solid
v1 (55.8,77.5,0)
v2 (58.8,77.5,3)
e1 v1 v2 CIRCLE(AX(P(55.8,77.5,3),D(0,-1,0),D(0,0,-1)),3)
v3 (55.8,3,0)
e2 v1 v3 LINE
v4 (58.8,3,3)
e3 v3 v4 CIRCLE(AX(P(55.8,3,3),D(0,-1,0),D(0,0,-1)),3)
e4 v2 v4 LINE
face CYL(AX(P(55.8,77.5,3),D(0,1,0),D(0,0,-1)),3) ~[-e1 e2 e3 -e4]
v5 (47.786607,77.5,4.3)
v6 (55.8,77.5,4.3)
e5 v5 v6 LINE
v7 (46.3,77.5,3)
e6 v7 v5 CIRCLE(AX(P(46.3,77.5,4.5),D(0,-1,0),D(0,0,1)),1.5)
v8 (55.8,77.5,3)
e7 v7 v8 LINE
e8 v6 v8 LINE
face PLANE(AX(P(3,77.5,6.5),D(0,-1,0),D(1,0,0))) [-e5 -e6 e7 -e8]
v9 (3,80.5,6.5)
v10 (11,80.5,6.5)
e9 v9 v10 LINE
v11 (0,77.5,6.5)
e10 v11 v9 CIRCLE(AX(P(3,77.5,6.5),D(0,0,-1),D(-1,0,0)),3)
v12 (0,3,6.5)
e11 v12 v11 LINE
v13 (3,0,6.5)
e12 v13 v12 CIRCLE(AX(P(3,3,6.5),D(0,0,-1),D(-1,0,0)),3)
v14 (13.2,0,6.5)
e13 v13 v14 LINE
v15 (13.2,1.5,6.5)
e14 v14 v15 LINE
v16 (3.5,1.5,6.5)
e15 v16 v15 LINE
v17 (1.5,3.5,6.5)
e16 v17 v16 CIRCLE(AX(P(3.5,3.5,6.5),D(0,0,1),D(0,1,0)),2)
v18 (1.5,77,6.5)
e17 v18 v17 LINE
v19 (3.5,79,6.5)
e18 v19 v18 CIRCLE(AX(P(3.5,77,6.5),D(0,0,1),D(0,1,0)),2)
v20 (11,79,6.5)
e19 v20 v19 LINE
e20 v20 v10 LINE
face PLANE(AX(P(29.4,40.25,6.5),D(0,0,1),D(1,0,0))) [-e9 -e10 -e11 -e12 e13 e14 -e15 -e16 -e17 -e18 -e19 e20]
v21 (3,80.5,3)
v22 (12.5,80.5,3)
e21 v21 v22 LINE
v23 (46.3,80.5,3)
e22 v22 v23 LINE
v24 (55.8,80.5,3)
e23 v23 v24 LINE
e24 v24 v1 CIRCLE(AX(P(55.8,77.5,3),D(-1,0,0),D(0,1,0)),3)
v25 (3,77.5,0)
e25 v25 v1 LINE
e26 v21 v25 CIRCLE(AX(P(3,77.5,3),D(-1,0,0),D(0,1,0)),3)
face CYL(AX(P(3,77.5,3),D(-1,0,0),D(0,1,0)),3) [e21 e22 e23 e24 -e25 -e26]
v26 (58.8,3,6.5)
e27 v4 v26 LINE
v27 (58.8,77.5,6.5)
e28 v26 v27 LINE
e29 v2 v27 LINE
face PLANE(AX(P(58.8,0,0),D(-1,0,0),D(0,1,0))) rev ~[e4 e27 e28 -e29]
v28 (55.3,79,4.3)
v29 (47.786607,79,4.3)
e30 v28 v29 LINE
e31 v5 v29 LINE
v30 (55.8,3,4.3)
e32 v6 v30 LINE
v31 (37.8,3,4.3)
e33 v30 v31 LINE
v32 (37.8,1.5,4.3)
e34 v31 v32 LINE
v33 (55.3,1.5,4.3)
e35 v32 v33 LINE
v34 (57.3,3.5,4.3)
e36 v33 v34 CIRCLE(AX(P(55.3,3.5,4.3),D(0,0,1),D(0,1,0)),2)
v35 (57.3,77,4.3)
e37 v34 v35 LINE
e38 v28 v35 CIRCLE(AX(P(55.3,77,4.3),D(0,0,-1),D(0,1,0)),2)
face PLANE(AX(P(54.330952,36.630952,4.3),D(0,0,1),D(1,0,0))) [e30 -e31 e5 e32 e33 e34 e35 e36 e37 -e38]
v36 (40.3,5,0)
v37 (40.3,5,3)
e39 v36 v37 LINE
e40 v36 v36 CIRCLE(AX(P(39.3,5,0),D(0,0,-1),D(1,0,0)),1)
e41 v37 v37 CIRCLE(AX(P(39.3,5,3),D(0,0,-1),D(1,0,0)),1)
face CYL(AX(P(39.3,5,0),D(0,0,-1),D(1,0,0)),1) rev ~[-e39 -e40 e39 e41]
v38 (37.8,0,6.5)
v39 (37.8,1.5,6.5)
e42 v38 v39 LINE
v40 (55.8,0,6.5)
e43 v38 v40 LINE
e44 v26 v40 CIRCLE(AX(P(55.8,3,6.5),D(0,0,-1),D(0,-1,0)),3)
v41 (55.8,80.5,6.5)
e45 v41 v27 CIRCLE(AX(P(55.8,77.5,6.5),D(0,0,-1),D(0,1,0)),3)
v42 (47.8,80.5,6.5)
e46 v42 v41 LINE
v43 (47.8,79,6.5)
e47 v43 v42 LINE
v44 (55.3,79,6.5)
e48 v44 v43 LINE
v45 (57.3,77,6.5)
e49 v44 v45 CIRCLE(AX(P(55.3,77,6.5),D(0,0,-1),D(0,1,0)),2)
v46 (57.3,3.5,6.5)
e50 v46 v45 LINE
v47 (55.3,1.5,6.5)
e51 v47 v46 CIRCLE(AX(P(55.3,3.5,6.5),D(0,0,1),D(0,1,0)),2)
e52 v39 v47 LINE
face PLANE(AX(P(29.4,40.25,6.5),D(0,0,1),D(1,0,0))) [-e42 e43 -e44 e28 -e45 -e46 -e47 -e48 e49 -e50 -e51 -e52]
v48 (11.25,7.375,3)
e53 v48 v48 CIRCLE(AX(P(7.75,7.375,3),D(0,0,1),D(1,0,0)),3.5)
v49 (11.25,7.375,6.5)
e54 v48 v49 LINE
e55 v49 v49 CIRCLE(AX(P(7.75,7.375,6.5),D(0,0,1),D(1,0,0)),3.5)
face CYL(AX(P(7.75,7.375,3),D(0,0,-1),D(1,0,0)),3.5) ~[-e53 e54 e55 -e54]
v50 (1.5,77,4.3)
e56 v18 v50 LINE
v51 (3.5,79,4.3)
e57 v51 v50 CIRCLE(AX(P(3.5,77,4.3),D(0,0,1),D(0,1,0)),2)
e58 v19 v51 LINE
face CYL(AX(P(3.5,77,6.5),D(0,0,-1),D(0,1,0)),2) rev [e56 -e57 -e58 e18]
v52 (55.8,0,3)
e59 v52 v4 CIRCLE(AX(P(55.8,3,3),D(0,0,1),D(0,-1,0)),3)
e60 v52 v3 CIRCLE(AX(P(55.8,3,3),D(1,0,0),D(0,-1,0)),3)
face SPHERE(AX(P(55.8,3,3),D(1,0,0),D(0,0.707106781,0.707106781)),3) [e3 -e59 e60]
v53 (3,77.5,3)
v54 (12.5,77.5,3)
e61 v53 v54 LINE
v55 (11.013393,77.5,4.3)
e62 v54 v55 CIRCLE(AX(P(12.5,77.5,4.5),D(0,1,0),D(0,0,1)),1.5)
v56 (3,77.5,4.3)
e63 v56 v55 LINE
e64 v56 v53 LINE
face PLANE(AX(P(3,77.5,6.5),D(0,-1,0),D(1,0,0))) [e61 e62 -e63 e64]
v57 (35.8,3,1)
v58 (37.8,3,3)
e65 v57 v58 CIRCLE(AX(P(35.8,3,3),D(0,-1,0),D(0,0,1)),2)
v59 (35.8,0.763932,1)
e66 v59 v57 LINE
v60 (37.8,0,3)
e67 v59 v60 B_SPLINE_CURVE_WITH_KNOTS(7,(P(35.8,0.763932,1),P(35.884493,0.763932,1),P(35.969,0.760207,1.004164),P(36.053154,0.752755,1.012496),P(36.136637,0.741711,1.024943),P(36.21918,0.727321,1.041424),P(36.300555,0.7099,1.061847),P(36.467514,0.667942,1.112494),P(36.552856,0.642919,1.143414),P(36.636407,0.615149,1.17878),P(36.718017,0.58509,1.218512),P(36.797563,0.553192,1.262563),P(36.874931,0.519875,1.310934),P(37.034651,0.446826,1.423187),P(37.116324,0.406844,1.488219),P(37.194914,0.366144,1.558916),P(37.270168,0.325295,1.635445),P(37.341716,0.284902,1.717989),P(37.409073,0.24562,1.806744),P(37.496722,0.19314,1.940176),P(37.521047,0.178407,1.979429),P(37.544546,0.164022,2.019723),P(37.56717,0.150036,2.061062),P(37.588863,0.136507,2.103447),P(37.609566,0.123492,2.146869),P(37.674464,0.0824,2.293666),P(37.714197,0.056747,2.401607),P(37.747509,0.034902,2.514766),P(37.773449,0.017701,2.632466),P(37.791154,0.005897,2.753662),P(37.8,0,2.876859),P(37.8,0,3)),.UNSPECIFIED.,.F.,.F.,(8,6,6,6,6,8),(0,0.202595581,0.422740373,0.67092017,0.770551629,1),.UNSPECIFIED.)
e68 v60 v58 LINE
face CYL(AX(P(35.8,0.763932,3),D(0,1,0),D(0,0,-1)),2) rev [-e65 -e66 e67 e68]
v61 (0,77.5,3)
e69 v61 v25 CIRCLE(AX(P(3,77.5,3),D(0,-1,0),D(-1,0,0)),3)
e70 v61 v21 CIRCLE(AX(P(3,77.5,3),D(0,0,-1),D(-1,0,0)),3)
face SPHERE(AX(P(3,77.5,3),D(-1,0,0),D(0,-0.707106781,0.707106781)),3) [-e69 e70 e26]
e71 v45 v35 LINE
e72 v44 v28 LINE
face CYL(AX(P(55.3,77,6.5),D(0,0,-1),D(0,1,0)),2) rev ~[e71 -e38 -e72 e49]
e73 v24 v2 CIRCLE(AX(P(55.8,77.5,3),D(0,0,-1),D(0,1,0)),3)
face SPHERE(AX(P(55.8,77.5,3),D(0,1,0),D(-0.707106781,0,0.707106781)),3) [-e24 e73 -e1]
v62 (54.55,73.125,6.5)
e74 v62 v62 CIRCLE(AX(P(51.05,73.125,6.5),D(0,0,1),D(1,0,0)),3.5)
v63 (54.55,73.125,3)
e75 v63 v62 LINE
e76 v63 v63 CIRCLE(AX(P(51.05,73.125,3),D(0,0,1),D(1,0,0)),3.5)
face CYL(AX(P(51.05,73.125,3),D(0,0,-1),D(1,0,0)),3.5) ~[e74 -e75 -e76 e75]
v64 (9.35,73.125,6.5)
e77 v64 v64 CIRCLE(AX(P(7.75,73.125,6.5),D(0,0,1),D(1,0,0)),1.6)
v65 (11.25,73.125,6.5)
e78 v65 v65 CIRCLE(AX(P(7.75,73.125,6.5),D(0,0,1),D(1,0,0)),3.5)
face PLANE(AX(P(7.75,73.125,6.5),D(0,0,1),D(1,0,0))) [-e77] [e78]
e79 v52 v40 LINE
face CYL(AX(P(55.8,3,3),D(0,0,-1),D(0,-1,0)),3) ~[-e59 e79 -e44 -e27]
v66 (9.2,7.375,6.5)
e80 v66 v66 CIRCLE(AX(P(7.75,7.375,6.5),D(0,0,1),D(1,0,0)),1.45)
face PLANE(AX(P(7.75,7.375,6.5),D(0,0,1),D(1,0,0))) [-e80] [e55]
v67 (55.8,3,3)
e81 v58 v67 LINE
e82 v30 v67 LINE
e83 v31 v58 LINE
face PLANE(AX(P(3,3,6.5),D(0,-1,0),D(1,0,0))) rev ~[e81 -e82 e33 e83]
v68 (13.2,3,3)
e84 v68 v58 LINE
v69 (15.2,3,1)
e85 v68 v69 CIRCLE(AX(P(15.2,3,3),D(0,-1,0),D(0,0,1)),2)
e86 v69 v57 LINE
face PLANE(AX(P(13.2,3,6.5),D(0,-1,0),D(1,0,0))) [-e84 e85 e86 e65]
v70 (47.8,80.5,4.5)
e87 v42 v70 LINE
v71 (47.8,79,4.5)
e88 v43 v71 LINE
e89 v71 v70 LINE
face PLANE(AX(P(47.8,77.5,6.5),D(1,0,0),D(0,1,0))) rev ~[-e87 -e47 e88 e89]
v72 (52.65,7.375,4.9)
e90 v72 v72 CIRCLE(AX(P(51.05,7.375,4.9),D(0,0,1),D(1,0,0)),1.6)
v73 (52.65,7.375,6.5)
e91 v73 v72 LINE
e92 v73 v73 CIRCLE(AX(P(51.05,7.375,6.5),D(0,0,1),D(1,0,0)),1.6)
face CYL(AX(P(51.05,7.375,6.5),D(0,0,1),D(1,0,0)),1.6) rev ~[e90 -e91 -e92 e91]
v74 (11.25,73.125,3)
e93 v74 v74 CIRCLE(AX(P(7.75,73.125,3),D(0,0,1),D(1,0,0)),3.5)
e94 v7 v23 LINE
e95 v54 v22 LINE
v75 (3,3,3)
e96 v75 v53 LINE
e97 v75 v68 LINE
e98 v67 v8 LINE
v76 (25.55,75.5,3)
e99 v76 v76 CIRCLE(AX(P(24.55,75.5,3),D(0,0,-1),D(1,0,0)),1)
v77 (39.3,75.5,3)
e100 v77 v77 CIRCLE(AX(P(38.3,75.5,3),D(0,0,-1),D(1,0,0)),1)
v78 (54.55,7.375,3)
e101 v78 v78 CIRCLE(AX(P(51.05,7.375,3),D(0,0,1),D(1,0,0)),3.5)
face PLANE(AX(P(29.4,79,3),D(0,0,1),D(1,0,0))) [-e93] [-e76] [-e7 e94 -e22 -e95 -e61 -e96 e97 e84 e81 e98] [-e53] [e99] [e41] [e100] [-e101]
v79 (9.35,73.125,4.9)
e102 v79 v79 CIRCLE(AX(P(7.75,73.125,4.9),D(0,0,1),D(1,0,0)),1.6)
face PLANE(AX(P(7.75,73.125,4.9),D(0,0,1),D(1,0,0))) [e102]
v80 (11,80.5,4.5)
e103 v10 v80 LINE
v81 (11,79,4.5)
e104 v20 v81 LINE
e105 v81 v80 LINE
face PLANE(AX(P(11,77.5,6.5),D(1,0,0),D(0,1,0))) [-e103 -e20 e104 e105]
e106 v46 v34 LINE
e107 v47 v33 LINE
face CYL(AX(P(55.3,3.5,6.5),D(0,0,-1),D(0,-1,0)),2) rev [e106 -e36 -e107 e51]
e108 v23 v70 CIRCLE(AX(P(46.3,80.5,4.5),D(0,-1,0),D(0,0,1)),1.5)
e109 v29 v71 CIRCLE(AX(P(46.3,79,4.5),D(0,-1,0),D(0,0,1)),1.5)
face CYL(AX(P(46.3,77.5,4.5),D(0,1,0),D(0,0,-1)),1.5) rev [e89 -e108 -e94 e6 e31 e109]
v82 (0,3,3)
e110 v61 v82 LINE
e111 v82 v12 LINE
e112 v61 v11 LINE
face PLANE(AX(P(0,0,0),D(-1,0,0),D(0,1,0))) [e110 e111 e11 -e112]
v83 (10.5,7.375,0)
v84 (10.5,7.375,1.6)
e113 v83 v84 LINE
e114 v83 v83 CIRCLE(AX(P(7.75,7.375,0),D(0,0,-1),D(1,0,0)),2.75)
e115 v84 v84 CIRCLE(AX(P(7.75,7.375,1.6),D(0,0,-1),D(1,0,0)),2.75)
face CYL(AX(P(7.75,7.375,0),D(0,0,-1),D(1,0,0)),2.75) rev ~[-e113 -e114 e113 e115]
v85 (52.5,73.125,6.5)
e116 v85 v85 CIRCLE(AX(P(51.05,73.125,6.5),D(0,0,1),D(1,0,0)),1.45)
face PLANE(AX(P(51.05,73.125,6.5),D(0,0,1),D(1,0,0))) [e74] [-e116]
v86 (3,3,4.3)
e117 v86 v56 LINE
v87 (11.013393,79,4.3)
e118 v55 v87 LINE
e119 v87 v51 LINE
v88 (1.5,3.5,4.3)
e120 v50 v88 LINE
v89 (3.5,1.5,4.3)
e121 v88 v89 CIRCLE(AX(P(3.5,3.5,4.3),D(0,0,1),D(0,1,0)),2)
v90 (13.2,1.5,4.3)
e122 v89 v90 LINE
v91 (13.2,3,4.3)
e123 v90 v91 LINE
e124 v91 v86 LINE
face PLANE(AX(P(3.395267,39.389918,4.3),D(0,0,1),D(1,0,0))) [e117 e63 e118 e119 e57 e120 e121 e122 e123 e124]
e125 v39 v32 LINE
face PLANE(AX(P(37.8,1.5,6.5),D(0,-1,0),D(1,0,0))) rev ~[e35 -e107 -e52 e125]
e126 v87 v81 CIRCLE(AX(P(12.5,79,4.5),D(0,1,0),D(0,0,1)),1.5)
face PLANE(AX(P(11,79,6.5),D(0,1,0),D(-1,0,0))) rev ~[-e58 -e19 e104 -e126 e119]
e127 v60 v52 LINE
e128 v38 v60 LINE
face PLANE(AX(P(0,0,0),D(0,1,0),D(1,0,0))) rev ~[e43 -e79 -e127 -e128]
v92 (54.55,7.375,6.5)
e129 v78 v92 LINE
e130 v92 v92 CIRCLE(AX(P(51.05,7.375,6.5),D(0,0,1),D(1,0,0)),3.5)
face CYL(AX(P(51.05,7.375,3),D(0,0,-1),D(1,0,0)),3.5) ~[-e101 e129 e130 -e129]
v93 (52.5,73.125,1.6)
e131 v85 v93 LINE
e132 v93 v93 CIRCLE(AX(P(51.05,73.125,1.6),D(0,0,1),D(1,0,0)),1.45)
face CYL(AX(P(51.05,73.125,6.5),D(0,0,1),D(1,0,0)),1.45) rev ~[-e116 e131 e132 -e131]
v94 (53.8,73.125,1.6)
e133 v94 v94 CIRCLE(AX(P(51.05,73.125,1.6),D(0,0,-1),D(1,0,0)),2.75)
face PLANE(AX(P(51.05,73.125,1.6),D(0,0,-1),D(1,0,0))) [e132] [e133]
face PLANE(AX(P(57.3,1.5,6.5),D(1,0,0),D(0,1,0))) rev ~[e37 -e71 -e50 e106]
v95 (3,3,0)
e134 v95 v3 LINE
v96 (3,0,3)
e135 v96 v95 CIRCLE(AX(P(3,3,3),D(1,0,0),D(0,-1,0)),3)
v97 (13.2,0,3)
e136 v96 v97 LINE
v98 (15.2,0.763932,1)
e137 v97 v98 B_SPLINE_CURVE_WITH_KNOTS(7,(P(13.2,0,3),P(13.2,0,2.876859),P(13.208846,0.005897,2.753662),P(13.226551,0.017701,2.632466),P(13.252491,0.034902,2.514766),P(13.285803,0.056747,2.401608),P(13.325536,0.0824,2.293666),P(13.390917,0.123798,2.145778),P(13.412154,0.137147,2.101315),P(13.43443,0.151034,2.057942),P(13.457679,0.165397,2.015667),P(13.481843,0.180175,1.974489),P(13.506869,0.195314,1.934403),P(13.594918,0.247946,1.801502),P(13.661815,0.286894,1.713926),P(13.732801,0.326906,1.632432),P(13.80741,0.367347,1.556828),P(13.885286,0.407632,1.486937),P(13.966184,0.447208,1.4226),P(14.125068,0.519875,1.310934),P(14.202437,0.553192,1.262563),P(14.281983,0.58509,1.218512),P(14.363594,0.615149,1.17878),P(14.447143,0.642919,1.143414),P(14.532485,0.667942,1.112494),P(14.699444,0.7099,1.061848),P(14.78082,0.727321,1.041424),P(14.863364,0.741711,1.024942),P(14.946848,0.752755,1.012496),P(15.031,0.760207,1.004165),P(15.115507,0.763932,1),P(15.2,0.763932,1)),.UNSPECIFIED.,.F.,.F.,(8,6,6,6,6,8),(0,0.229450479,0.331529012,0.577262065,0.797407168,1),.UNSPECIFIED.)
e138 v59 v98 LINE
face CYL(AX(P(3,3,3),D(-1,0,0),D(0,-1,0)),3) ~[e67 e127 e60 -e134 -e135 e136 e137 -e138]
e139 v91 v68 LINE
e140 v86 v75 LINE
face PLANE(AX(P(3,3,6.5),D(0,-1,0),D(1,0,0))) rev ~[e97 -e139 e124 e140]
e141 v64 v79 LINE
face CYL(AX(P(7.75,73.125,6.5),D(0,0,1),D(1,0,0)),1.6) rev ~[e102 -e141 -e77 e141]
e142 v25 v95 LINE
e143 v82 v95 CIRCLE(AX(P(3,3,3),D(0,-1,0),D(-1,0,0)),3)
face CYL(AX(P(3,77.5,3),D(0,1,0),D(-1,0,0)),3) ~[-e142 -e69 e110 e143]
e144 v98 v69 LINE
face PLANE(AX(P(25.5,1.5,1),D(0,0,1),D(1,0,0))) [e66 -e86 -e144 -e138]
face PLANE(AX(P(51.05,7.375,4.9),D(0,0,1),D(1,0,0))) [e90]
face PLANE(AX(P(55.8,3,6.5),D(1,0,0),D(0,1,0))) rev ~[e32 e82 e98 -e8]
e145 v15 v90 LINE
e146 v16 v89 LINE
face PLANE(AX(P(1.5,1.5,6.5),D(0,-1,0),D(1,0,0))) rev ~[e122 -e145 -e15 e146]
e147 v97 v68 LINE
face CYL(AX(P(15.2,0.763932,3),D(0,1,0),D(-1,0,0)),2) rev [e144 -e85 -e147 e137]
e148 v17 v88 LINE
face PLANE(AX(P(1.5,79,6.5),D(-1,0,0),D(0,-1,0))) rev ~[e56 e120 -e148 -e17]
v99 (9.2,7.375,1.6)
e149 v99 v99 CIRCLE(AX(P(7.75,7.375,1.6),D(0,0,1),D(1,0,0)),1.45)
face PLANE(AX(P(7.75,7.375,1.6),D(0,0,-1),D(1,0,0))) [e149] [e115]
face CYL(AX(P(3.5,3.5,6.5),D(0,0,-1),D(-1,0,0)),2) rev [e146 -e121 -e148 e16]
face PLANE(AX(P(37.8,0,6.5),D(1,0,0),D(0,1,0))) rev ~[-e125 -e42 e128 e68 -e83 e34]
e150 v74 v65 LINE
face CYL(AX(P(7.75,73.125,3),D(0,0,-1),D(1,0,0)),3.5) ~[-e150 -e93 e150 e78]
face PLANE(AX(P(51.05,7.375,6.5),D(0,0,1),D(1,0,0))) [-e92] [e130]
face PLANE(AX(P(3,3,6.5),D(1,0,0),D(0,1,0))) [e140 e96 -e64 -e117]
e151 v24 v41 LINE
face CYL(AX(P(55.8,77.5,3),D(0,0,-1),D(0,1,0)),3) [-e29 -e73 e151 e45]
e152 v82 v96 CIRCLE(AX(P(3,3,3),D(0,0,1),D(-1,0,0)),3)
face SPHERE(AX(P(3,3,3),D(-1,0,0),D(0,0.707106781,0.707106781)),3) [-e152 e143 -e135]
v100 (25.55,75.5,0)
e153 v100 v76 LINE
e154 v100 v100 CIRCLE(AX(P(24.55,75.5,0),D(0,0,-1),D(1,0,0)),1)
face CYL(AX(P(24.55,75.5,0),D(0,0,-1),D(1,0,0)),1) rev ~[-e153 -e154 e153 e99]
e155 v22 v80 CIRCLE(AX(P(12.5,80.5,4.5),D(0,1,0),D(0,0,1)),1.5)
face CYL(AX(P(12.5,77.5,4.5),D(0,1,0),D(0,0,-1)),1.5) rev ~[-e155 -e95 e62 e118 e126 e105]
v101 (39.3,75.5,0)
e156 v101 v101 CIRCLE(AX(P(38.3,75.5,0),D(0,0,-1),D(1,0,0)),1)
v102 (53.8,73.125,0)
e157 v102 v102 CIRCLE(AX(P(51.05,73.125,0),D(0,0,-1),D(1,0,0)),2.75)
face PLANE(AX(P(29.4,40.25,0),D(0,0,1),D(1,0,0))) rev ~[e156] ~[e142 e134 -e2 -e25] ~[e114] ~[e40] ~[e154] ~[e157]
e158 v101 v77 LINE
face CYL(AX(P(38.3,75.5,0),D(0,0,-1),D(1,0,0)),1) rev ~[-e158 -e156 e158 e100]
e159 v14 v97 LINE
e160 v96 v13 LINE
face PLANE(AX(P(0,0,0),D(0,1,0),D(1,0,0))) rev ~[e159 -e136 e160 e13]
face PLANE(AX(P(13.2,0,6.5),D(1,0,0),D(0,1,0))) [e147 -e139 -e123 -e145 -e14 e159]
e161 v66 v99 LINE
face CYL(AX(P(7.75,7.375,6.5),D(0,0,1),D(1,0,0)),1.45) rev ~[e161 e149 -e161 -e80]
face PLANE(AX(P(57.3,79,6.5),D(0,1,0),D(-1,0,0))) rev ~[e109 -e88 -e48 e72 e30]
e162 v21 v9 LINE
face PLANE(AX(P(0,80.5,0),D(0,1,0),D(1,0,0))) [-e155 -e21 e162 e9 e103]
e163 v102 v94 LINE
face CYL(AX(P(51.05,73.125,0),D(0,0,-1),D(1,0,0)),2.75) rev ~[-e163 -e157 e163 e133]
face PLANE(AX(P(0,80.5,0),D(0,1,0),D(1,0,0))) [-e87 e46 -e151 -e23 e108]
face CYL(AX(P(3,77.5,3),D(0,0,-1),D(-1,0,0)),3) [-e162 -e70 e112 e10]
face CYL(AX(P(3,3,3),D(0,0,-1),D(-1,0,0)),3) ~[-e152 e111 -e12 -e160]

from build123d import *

# Parameters (mm, degrees)
F0_W          = 58.8
F0_H          = 80.5
F1_DEPTH      = 6.5
F2_W          = 52.8
F2_H          = 74.5
F3_DEPTH      = 3.5
F5_R          = 3.5
F6_DEPTH      = 3.5
F8_R          = 1.45
F10_R         = 1.45
F11_DEPTH     = 6.501
F9_R          = 1.6
F7_R          = 1.6
F12_DEPTH     = 1.6
F13_W         = 36.8
F13_H         = 3
F14_DEPTH     = 3.5
F15_W         = 24.6
F15_H         = 3
F16_DEPTH     = 5.5
F19_DEPTH     = 2.2
F20_R         = 1
F21_DEPTH     = 6.501
F22_T1_DEPTH  = 11
F22_T3_DEPTH  = 52.8
F22_T5_DEPTH  = 74.5
F22_S9_W      = 3
F22_S9_H      = 3
F22_T10_DEPTH = 3
F22_S15_W     = 3
F22_S15_H     = 3
F22_T16_DEPTH = 3
F22_S21_W     = 3
F22_S21_H     = 3
F22_T22_DEPTH = 3
F22_S27_W     = 3
F22_S27_H     = 3
F22_T28_DEPTH = 3
F24_R         = 2
F25_R         = 1.5
F26_R         = 2
F27_R         = 2.75
F28_DEPTH     = 1.6


# Not quite as in the source:
# - a fillet or chamfer that OpenCascade refuses, or shapes differently, is made with other operations: its cross-section is extruded or revolved along the edge and cut away or added
# - a feature of the source that left no trace in its solid (it failed there, or was rolled back) is left out


with BuildPart() as f1:
    # F0 (on Top) → F1 (new body)
    with BuildSketch(Plane.XY):
        with Locations((29.4, 40.25)):
            Rectangle(F0_W, F0_H)
    extrude(amount=F1_DEPTH)

    # F2 (on face) → F3 (cut)
    with BuildSketch(Plane.XY.offset(6.5)):
        with Locations((29.4, 40.25)):
            Rectangle(F2_W, F2_H)
    extrude(amount=-F3_DEPTH, mode=Mode.SUBTRACT)

    # F5 (on face) → F6 (join)
    with BuildSketch(Plane.XY.offset(3)):
        with Locations((7.75, 7.375)):
            Circle(F5_R)
        with Locations((7.75, 73.125)):
            Circle(F5_R)
        with Locations((51.05, 73.125)):
            Circle(F5_R)
        with Locations((51.05, 7.375)):
            Circle(F5_R)
    extrude(amount=F6_DEPTH)

    # F8 (on face) + F10 (on face) → F11 (cut, through all)
    with BuildSketch(Plane.XY.offset(6.5)):
        with Locations((51.05, 73.125)):
            Circle(F8_R)
    with BuildSketch(Plane.XY.offset(6.5)):
        with Locations((7.75, 7.375)):
            Circle(F10_R)
    extrude(amount=-F11_DEPTH, mode=Mode.SUBTRACT)

    # F9 (on face) + F7 (on face) → F12 (cut)
    with BuildSketch(Plane.XY.offset(6.5)):
        with Locations((7.75, 73.125)):
            Circle(F9_R)
    with BuildSketch(Plane.XY.offset(6.5)):
        with Locations((51.05, 7.375)):
            Circle(F7_R)
    extrude(amount=-F12_DEPTH, mode=Mode.SUBTRACT)

    # F13 (on face) → F14 (cut)
    with BuildSketch(Plane.XY.offset(6.5)):
        with Locations((29.4, 79)):
            Rectangle(F13_W, F13_H)
    extrude(amount=-F14_DEPTH, mode=Mode.SUBTRACT)

    # F15 (on face) → F16 (cut)
    with BuildSketch(Plane.XY.offset(6.5)):
        with Locations((25.5, 1.5)):
            Rectangle(F15_W, F15_H)
    extrude(amount=-F16_DEPTH, mode=Mode.SUBTRACT)

    # F17 (on face) + F18 (on face) → F19 (cut)
    with BuildSketch(Plane.XY.offset(6.5)):
        Polygon((47.8, 79), (47.8, 77.5), (55.8, 77.5), (55.8, 3), (37.8, 3), (37.8, 1.5), (57.3, 1.5), (57.3, 79), align=None)
    with BuildSketch(Plane.XY.offset(6.5)):
        Polygon((1.5, 1.5), (13.2, 1.5), (13.2, 3), (3, 3), (3, 77.5), (11, 77.5), (11, 79), (1.5, 79), align=None)
    extrude(amount=-F19_DEPTH, mode=Mode.SUBTRACT)

    # F20 (on face) → F21 (cut, through all)
    with BuildSketch(Plane(origin=(0, 0, 0), x_dir=(1, 0, 0), z_dir=(0, 0, -1))):
        with Locations((39.3, -5)):
            Circle(F20_R)
        with Locations((38.3, -75.5)):
            Circle(F20_R)
        with Locations((24.55, -75.5)):
            Circle(F20_R)
    extrude(amount=-F21_DEPTH, mode=Mode.SUBTRACT)

    # F22: fillet of radius 3 on 8 edges, made by hand

    # F22_s2 → F22_t1 (cut)
    with BuildSketch(Plane.XY.offset(3)):
        with BuildLine():
            ThreePointArc((0, 3), (0.8786796564, 0.8786796564), (3, 0))
            Line((3, 0), (0, 0))
            Line((0, 0), (0, 3))
        make_face()
        with BuildLine():
            ThreePointArc((55.8, 0), (57.9213203436, 0.8786796564), (58.8, 3))
            Line((58.8, 3), (58.8, 0))
            Line((58.8, 0), (55.8, 0))
        make_face()
        with BuildLine():
            ThreePointArc((0, 77.5), (0.8786796564, 79.6213203436), (3, 80.5))
            Line((3, 80.5), (0, 80.5))
            Line((0, 80.5), (0, 77.5))
        make_face()
        with BuildLine():
            ThreePointArc((55.8, 80.5), (57.9213203436, 79.6213203436), (58.8, 77.5))
            Line((58.8, 77.5), (58.8, 80.5))
            Line((58.8, 80.5), (55.8, 80.5))
        make_face()
    extrude(amount=F22_T1_DEPTH, mode=Mode.SUBTRACT)

    # F22_s4 → F22_t3 (cut)
    with BuildSketch(Plane.YZ.offset(3)):
        with BuildLine():
            ThreePointArc((0, 3), (0.8786796564, 0.8786796564), (3, 0))
            Line((3, 0), (0, 0))
            Line((0, 0), (0, 3))
        make_face()
        with BuildLine():
            ThreePointArc((80.5, 3), (79.6213203436, 0.8786796564), (77.5, 0))
            Line((77.5, 0), (80.5, 0))
            Line((80.5, 0), (80.5, 3))
        make_face()
    extrude(amount=F22_T3_DEPTH, mode=Mode.SUBTRACT)

    # F22_s6 → F22_t5 (cut)
    with BuildSketch(Plane.XZ.offset(-77.5)):
        with BuildLine():
            ThreePointArc((0, 3), (0.8786796564, 0.8786796564), (3, 0))
            Line((3, 0), (0, 0))
            Line((0, 0), (0, 3))
        make_face()
        with BuildLine():
            ThreePointArc((55.8, 0), (57.9213203436, 0.8786796564), (58.8, 3))
            Line((58.8, 3), (58.8, 0))
            Line((58.8, 0), (55.8, 0))
        make_face()
    extrude(amount=F22_T5_DEPTH, mode=Mode.SUBTRACT)


with BuildPart() as f22_tool8:
    # F22_s9 → F22_t10 (new body)
    with BuildSketch(Plane.YZ.offset(3)):
        with Locations((1.5, 1.5)):
            Rectangle(F22_S9_W, F22_S9_H)
    extrude(amount=-F22_T10_DEPTH)

    # F22_s11 → F22_t12 (revolve, cut)
    with BuildSketch(Plane(origin=(3, 3, 3), x_dir=(0, 0.7071067812, 0.7071067812), z_dir=(0, -0.7071067812, 0.7071067812))):
        with BuildLine():
            ThreePointArc((0, -3), (3, 0), (0, 3))
            Line((0, 3), (0, -3))
        make_face()
    revolve(axis=Axis((3, 3, 3), (-1, 0, 0)), mode=Mode.SUBTRACT)


with BuildPart() as f1_1:
    add(f1.part)

    # F22_t7: cut F22_tool8
    add(f22_tool8.part, mode=Mode.SUBTRACT)


with BuildPart() as f22_tool14:
    # F22_s15 → F22_t16 (new body)
    with BuildSketch(Plane.YZ.offset(55.8)):
        with Locations((1.5, 1.5)):
            Rectangle(F22_S15_W, F22_S15_H)
    extrude(amount=F22_T16_DEPTH)

    # F22_s17 → F22_t18 (revolve, cut)
    with BuildSketch(Plane(origin=(55.8, 3, 3), x_dir=(0, 0.7071067812, 0.7071067812), z_dir=(0, 0.7071067812, -0.7071067812))):
        with BuildLine():
            ThreePointArc((0, -3), (3, 0), (0, 3))
            Line((0, 3), (0, -3))
        make_face()
    revolve(axis=Axis((55.8, 3, 3), (1, 0, 0)), mode=Mode.SUBTRACT)


with BuildPart() as f1_2:
    add(f1_1.part)

    # F22_t13: cut F22_tool14
    add(f22_tool14.part, mode=Mode.SUBTRACT)


with BuildPart() as f22_tool20:
    # F22_s21 → F22_t22 (new body)
    with BuildSketch(Plane.YZ.offset(3)):
        with Locations((79, 1.5)):
            Rectangle(F22_S21_W, F22_S21_H)
    extrude(amount=-F22_T22_DEPTH)

    # F22_s23 → F22_t24 (revolve, cut)
    with BuildSketch(Plane(origin=(3, 77.5, 3), x_dir=(0, -0.7071067812, 0.7071067812), z_dir=(0, -0.7071067812, -0.7071067812))):
        with BuildLine():
            ThreePointArc((0, -3), (3, 0), (0, 3))
            Line((0, 3), (0, -3))
        make_face()
    revolve(axis=Axis((3, 77.5, 3), (-1, 0, 0)), mode=Mode.SUBTRACT)


with BuildPart() as f1_3:
    add(f1_2.part)

    # F22_t19: cut F22_tool20
    add(f22_tool20.part, mode=Mode.SUBTRACT)


with BuildPart() as f22_tool26:
    # F22_s27 → F22_t28 (new body)
    with BuildSketch(Plane.XZ.offset(-77.5)):
        with Locations((57.3, 1.5)):
            Rectangle(F22_S27_W, F22_S27_H)
    extrude(amount=-F22_T28_DEPTH)

    # F22_s29 → F22_t30 (revolve, cut)
    with BuildSketch(Plane(origin=(55.8, 77.5, 3), x_dir=(-0.7071067812, 0, 0.7071067812), z_dir=(-0.7071067812, 0, -0.7071067812))):
        with BuildLine():
            ThreePointArc((0, -3), (3, 0), (0, 3))
            Line((0, 3), (0, -3))
        make_face()
    revolve(axis=Axis((55.8, 77.5, 3), (0, 1, 0)), mode=Mode.SUBTRACT)


with BuildPart() as f1_4:
    add(f1_3.part)

    # F22_t25: cut F22_tool26
    add(f22_tool26.part, mode=Mode.SUBTRACT)

    # F24
    f24_edges = [f1_4.edges().sort_by_distance(p)[0] for p in [
        (57.3, 79, 5.4),
        (57.3, 1.5, 5.4),
        (1.5, 1.5, 5.4),
        (1.5, 79, 5.4),
    ]]
    fillet(f24_edges, radius=F24_R)

    # F25#2 (call 1 of 2: OpenCascade refuses the feature's edges together)
    f25_2_edges = [f1_4.edges().sort_by_distance(p)[0] for p in [
        (47.8, 79, 3),
    ]]
    fillet(f25_2_edges, radius=F25_R)

    # F25 (call 2 of 2)
    f25_edges = [f1_4.edges().sort_by_distance(p)[0] for p in [
        (11, 79, 3),
    ]]
    fillet(f25_edges, radius=F25_R)

    # F26
    f26_edges = [f1_4.edges().sort_by_distance(p)[0] for p in [
        (13.2, 1.881966, 1),
        (37.8, 1.881966, 1),
    ]]
    fillet(f26_edges, radius=F26_R)

    # F27 (on face) → F28 (cut)
    with BuildSketch(Plane(origin=(0, 0, 0), x_dir=(1, 0, 0), z_dir=(0, 0, -1))):
        with Locations((51.05, -73.125)):
            Circle(F27_R)
        with Locations((7.75, -7.375)):
            Circle(F27_R)
    extrude(amount=-F28_DEPTH, mode=Mode.SUBTRACT)


solid = f1_4.part
